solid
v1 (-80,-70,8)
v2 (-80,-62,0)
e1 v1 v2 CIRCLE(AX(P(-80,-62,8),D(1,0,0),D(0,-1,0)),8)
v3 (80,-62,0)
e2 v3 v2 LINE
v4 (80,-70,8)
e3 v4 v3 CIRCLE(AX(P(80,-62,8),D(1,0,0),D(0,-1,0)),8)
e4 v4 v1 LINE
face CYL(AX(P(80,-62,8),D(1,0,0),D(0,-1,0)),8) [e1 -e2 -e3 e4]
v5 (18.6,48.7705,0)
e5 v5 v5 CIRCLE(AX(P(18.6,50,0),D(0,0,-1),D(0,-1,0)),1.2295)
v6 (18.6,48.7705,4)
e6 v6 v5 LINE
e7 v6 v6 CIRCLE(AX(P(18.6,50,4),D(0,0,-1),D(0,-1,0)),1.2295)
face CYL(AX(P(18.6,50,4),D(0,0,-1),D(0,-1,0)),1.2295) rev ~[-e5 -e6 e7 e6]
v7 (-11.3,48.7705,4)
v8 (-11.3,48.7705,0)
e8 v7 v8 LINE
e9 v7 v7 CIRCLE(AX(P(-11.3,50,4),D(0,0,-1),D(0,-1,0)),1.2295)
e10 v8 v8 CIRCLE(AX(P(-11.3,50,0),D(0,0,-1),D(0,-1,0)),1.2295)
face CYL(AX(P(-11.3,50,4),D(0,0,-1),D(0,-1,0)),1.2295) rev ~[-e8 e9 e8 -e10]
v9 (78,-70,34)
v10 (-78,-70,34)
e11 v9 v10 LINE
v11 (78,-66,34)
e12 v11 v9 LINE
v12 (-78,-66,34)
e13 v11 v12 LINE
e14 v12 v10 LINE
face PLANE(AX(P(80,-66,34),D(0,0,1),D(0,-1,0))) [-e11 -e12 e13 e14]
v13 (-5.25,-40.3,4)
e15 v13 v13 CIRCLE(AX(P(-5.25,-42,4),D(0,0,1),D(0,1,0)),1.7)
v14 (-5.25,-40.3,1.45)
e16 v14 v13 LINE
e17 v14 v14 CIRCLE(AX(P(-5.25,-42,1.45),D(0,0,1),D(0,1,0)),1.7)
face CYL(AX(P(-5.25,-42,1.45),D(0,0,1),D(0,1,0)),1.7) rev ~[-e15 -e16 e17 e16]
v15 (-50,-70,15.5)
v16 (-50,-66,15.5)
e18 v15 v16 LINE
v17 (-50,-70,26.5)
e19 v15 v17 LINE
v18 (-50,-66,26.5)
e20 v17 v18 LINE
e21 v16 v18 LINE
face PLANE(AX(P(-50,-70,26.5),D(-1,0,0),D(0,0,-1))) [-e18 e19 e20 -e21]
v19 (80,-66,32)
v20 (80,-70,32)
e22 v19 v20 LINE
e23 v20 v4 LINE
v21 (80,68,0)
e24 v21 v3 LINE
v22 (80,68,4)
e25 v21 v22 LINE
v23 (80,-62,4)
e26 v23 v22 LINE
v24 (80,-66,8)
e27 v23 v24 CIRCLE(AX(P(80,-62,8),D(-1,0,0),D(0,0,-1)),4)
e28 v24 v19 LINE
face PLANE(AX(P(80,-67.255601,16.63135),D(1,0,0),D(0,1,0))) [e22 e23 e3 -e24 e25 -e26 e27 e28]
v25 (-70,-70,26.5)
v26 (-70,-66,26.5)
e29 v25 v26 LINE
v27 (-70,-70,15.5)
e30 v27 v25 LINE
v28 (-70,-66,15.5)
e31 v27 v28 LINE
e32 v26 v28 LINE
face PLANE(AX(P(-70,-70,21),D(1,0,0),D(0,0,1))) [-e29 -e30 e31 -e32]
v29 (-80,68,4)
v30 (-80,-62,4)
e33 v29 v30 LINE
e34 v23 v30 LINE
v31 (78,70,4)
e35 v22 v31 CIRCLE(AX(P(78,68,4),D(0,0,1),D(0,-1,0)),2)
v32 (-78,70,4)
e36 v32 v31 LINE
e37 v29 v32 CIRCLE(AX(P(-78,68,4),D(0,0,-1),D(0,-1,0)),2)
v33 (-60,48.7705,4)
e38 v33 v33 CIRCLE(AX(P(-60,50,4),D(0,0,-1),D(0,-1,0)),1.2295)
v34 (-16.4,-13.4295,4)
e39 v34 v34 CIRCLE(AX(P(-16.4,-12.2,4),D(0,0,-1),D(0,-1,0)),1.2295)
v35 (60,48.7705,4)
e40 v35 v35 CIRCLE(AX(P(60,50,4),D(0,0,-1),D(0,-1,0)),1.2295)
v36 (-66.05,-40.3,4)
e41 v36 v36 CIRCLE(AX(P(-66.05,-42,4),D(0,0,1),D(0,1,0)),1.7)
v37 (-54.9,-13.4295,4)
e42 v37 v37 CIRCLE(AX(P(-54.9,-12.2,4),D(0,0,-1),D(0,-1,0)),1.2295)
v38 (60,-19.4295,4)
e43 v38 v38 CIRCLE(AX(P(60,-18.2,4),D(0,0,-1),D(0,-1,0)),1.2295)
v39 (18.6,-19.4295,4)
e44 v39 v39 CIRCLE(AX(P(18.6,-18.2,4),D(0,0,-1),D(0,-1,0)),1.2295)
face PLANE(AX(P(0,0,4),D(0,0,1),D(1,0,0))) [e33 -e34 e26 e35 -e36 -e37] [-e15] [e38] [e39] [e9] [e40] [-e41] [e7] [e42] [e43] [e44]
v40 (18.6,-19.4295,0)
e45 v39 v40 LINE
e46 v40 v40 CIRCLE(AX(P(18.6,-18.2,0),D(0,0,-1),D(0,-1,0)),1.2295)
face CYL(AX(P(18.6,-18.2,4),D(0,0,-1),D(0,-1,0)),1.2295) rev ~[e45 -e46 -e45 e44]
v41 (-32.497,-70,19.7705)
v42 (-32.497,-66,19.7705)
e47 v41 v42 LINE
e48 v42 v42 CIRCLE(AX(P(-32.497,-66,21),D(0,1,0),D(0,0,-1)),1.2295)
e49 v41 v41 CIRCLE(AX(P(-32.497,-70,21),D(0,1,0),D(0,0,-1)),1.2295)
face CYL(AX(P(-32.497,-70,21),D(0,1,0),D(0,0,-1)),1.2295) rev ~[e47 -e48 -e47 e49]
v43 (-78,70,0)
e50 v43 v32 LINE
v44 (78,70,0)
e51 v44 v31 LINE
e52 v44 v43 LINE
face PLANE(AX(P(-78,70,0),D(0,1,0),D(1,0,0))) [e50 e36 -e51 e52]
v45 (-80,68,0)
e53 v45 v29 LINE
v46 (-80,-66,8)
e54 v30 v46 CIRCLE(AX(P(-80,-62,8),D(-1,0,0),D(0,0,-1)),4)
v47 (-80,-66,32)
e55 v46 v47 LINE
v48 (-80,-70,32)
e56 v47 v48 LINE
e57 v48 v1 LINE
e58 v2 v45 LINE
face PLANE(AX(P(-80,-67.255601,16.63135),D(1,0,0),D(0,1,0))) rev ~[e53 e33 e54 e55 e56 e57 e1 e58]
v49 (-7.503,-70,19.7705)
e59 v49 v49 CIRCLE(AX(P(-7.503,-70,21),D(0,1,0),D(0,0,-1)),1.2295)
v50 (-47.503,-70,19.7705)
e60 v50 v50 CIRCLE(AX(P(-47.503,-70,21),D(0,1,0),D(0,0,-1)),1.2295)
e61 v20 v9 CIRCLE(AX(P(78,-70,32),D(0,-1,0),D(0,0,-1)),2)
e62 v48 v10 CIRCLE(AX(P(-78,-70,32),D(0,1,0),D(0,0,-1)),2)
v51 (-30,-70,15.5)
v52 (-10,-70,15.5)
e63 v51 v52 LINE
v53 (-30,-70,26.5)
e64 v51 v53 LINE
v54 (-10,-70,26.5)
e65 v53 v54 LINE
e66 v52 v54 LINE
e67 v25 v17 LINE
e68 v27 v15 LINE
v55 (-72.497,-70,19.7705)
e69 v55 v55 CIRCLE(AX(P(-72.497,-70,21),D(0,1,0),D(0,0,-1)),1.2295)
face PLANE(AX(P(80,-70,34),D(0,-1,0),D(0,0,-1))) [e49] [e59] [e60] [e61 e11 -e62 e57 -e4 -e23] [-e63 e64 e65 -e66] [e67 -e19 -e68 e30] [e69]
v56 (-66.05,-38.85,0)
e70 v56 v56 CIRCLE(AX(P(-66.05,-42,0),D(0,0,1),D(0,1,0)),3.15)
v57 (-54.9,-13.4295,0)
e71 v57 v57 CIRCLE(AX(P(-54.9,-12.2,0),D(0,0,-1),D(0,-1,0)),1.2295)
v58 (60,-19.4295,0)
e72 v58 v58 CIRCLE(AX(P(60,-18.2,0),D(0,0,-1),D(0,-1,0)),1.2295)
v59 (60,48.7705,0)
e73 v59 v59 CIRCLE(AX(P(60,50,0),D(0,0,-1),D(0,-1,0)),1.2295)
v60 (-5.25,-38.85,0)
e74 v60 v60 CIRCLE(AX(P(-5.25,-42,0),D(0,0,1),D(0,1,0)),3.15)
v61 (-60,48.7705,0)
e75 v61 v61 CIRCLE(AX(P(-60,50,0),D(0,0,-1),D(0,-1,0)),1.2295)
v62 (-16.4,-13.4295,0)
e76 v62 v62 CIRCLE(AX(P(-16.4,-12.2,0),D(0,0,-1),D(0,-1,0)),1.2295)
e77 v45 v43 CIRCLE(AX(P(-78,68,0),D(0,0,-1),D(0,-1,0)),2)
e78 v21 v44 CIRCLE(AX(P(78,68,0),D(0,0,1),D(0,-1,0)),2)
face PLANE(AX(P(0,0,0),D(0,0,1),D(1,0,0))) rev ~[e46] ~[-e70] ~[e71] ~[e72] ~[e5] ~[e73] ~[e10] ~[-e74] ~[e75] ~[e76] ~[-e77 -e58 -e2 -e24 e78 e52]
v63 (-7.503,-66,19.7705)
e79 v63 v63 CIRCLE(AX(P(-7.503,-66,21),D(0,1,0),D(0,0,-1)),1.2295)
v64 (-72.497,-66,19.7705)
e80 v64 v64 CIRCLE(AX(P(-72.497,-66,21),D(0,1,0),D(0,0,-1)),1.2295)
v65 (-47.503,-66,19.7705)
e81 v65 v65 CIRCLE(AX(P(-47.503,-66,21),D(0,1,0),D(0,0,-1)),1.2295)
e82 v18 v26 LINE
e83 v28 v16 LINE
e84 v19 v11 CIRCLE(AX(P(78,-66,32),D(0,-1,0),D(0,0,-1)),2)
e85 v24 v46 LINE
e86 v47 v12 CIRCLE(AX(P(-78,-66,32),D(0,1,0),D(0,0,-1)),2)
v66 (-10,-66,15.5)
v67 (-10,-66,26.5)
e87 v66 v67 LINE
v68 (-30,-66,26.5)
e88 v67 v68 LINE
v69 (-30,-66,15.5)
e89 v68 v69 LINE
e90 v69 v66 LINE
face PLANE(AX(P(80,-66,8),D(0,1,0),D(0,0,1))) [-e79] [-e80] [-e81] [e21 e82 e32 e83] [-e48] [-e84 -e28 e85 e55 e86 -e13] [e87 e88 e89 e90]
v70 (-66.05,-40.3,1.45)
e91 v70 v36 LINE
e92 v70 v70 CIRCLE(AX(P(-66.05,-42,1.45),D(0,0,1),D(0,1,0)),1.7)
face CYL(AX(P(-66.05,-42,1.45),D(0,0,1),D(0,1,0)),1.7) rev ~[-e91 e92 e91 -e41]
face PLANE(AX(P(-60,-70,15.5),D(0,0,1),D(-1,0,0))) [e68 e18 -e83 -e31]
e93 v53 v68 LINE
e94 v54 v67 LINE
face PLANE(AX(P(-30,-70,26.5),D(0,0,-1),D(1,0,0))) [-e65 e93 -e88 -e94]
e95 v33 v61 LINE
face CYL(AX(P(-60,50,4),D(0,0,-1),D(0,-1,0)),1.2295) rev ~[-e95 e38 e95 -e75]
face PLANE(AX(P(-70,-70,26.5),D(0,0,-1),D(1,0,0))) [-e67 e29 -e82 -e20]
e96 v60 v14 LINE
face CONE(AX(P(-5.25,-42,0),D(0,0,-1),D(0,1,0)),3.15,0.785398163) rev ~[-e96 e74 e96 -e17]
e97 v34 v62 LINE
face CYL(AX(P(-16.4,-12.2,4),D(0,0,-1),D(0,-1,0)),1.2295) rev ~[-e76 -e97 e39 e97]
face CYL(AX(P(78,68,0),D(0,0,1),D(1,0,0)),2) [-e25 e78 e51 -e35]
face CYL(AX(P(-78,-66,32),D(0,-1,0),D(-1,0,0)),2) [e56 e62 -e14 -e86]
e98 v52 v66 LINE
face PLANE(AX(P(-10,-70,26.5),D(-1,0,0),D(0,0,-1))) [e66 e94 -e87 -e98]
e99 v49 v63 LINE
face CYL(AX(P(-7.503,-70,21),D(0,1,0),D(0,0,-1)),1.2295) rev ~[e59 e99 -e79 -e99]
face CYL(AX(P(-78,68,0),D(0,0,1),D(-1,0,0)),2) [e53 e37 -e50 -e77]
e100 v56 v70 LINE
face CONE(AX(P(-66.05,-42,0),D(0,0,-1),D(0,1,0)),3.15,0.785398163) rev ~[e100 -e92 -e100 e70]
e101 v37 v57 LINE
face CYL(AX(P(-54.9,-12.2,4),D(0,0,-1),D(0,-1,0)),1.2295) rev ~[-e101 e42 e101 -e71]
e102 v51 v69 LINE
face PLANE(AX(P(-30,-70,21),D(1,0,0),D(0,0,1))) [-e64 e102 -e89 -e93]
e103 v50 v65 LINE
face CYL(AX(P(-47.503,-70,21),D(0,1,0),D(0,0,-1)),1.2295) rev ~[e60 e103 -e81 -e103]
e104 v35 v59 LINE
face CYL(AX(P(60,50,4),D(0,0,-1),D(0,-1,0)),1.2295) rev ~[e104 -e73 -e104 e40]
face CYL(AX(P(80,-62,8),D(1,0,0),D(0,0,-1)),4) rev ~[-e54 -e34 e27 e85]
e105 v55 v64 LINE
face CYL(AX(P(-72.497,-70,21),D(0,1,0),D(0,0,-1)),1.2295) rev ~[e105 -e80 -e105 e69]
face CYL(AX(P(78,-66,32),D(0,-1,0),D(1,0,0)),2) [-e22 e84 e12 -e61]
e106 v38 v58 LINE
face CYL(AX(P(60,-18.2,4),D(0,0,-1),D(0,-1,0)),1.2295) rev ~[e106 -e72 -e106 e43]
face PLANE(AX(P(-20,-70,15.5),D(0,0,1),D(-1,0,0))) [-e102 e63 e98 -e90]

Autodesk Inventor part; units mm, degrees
ref_plane "Plan YZ" through (0, 0, 0) normal (1, 0, 0) x (0, 1, 0)
ref_plane "Plan XZ" through (0, 0, 0) normal (0, 1, 0) x (-1, 0, 0)
ref_plane "Plan XY" through (0, 0, 0) normal (0, 0, 1) x (1, 0, 0)
sketch "Esquisse1" plane through (0, 0, 0) normal (0, 0, 1) x (1, 0, 0)
  line L0 (-78, 70) -> (78, 70)
  line L1 (80, 68) -> (80, -68)
  line L2 (78, -70) -> (-78, -70)
  line L3 (-80, -68) -> (-80, 68)
  line L4 (-112, 0) -> (112, 0) construction
  line L5 (0, -98) -> (0, 98) construction
  line L6 (-80, 68) -> (-80, 70)
  line L7 (-80, 70) -> (-78, 70)
  line L8 (80, 68) -> (80, 70)
  line L9 (78, 70) -> (80, 70)
  line L10 (-78, -70) -> (-80, -70)
  line L11 (-80, -70) -> (-80, -68)
  line L12 (78, -70) -> (80, -70)
  line L13 (80, -70) -> (80, -68)
  point P0 (0, 0)
  dimension "d0" = 160
  dimension "d1" = 140
extrude "Extrusion1" add sketch "Esquisse1" along normal blind 4
sketch "Esquisse5" plane through (0, 0, 4) normal (0, 0, 1) x (1, 0, 0)
  line L0 (18.6, 50) -> (60, 50) construction
  line L1 (60, 50) -> (60, -18.2) construction
  line L2 (60, -18.2) -> (18.6, -18.2) construction
  line L3 (18.6, -18.2) -> (18.6, 50) construction
  line L4 (80, -70.465) -> (80, 70)
  line L5 (80, 70) -> (-80, 70)
  line L6 (80, 70) -> (-80, 70) projected
  line L7 (80, -70) -> (80, 70) projected
  point P0 (0, 0)
  point P1 (0, 0)
  point P2 (78, 70)
  point P3 (-78, 70)
  point P4 (80, -68)
  point P5 (80, 68)
  dimension "d12" = 41.4
  dimension "d13" = 68.2
  dimension "d14" = 20
  dimension "d15" = 20
hole "Perçage1" at (18.6, 50, 4) at (60, 50, 4) at (18.6, -18.2, 4) at (60, -18.2, 4) direction (0, 0, -1) diameter 2.459 end through all thread size "M3x0.5" class "6H" standard "ISO M"
sketch "Esquisse6" plane through (0, 0, 4) normal (0, 0, 1) x (1, 0, 0)
  line L0 (-60, 50) -> (-11.3, 50) construction
  line L1 (-11.3, 50) -> (-11.3, -12.2) construction
  line L2 (-11.3, -12.2) -> (-60, -12.2) construction
  line L3 (-60, -12.2) -> (-60, 50) construction
  line L4 (-35.65, 66.5768) -> (-35.65, 16.8329)
  line L5 (-80, 70) -> (-80, -63.3699)
  line L6 (-80, 70) -> (-80, -70) construction
  line L7 (80, 70) -> (-80, 70) projected
  circle A0 centre (18.6, 50) radius 1.2295 construction
  point P0 (0, 0)
  point P1 (0, 0)
  point P2 (-54.9, -12.2)
  point P3 (-16.4, -12.2)
  point P4 (-80, 68)
  point P5 (-80, -68)
  point P6 (78, 70)
  point P7 (-78, 70)
  dimension "d23" = 62.2
  dimension "d24" = 38.5
  dimension "d25" = 48.7
  dimension "d26" = 48.7
  dimension "d27" = 20
hole "Perçage2" at (-54.9, -12.2, 4) at (-16.4, -12.2, 4) at (-60, 50, 4) at (-11.3, 50, 4) direction (0, 0, -1) diameter 2.459 end through all thread size "M3x0.5" class "6H" standard "ISO M"
sketch "Esquisse10" plane through (80, -66, 0) normal (0, -1, 0) x (1, 0, 0)
  line L0 (-160, 0) -> (0, 0)
  line L1 (0, 0) -> (0, 34)
  line L2 (0, 34) -> (-160, 34)
  line L3 (-160, 34) -> (-160, 0)
edge flange "Bord tombé2" height 34 angle 90 thickness 4 bend radius 4 thickness toward (0, -1, 0) relief straight relief width 4 relief depth 2 edges at (0, -70, 4) wall of the first edge with corners at (-80, -66, 0) (80, -66, 0) (80, -66, 34) (-80, -66, 34)
bend "Pli3"
corner "Coin2"
fillet "Congé1" radius 2 4 edges at (-80, -68, 34) (80, -68, 34) (80, 70, 2) (-80, 70, 2)
sketch "Esquisse13" plane through (0, 0, 0) normal (0, 0, -1) x (-1, 0, 0)
  line L0 (35.65, 25.8994) -> (35.65, -17.0856) construction
  line L1 (80, -70) -> (-80, -70) construction
  line L2 (80, 70) -> (80, -62) construction
  line L3 (151.9558, 0) -> (-118.6593, 0) construction
  line L4 (80, -62) -> (-80, -62) projected
  point P0 (0, 0)
  point P1 (0, 0)
  point P2 (0, 0)
  point P3 (66.05, -42)
  point P4 (5.25, -42)
  point P5 (16.4, 8.1)
  point P6 (80, 68)
  dimension "d102" = 38.5
  dimension "d107" = 60.8
  dimension "d115" = 20
hole "Perçage4" at (-5.25, -42, 0) at (-66.05, -42, 0) direction (0, 0, 1) diameter 3.4 end through all countersink diameter 6.3 countersink angle 90 clearance for "Vis à tête plate fraisée ISO 2009/7046" size "M3" standard "ISO"
sketch "Esquisse12" plane through (-80, -70, 8) normal (0, -1, 0) x (1, 0, 0)
  line L0 (10, 18.5) -> (30, 18.5)
  line L1 (30, 18.5) -> (30, 7.5)
  line L2 (30, 7.5) -> (10, 7.5)
  line L3 (10, 7.5) -> (10, 18.5)
  line L4 (50, 18.5) -> (70, 18.5)
  line L5 (70, 18.5) -> (70, 7.5)
  line L6 (70, 7.5) -> (50, 7.5)
  line L7 (50, 7.5) -> (50, 18.5)
  line L8 (2, 26) -> (158, 26)
  line L9 (-10.9148, 13) -> (171.3992, 13)
  line L10 (20, 22.4004) -> (20, 5.8983)
  line L11 (60, 25.3782) -> (60, 6.6427)
  line L12 (0, -0.9203) -> (0, 29.0797)
  line L13 (40, 26) -> (40, -5.9495)
  line L14 (0, 0) -> (0, 26) projected
  line L15 (0, 26) -> (160, 26) projected
  point P0 (80, -8)
  point P1 (80, -2)
  point P2 (0, 24)
  point P3 (2, 26)
  point P4 (158, 26)
  point P5 (7.503, 13)
  point P6 (32.497, 13)
  point P7 (47.503, 13)
  point P8 (72.497, 13)
  dimension "d81" = 26
  dimension "d82" = 11
  dimension "d83" = 20
  dimension "d84" = 20
  dimension "d85" = 20
  dimension "d89" = 20
  dimension "d90" = 80
  dimension "d116" = 24.994
  dimension "d117" = 24.994
extrude "Extrusion5" cut sketch "Esquisse12" against normal through all contours L0 L10 L9 L3 | L0 L1 L9 L10 | L9 L10 L2 L3 | L9 L1 L2 L10 | L4 L11 L9 L7 | L4 L5 L9 L11 | L9 L11 L6 L7 | L9 L5 L6 L11
hole "Perçage5" at (-72.497, -70, 21) at (-47.503, -70, 21) at (-32.497, -70, 21) at (-7.503, -70, 21) direction (0, 1, 0) diameter 2.459 end through all thread size "M3x0.5" class "6H" standard "ISO M"
equation "\"d26\" = d25"
equation "\"d102\" = d24"
equation "\"d113\" = Epaisseur"
equation "\"d90\" = 0.5 * d91"
equation "\"d65\" = LargeurGrugeage"
equation "\"d66\" = ProfondeurGrugeage"
equation "\"d67\" = RestesMinimum"
equation "\"d68\" = RayonPli"
equation "\"d71\" = RayonPli"
equation "\"d72\" = TailleGrugeage"
equation "\"d73\" = TailleJeu"
equation "\"d74\" = TailleRayonJacobi"
equation "\"d117\" = d116"
equation "\"RayonPli\" = Epaisseur"
equation "\"LargeurGrugeage\" = Epaisseur"
equation "\"ProfondeurGrugeage\" = 0.5 * Epaisseur"
equation "\"TailleGrugeage\" = 4 * Epaisseur"
equation "\"RestesMinimum\" = 2 * Epaisseur"
equation "\"Rayondetransition\" = RayonPli"
equation "\"TailleRayonJacobi\" = Epaisseur"
equation "\"TailleJeu\" = Epaisseur"
equation "\"Epaisseur\" = 4"
equation "\"d91\" = 160"
properties part number "P1704_007" material "Plastique PMMA"
